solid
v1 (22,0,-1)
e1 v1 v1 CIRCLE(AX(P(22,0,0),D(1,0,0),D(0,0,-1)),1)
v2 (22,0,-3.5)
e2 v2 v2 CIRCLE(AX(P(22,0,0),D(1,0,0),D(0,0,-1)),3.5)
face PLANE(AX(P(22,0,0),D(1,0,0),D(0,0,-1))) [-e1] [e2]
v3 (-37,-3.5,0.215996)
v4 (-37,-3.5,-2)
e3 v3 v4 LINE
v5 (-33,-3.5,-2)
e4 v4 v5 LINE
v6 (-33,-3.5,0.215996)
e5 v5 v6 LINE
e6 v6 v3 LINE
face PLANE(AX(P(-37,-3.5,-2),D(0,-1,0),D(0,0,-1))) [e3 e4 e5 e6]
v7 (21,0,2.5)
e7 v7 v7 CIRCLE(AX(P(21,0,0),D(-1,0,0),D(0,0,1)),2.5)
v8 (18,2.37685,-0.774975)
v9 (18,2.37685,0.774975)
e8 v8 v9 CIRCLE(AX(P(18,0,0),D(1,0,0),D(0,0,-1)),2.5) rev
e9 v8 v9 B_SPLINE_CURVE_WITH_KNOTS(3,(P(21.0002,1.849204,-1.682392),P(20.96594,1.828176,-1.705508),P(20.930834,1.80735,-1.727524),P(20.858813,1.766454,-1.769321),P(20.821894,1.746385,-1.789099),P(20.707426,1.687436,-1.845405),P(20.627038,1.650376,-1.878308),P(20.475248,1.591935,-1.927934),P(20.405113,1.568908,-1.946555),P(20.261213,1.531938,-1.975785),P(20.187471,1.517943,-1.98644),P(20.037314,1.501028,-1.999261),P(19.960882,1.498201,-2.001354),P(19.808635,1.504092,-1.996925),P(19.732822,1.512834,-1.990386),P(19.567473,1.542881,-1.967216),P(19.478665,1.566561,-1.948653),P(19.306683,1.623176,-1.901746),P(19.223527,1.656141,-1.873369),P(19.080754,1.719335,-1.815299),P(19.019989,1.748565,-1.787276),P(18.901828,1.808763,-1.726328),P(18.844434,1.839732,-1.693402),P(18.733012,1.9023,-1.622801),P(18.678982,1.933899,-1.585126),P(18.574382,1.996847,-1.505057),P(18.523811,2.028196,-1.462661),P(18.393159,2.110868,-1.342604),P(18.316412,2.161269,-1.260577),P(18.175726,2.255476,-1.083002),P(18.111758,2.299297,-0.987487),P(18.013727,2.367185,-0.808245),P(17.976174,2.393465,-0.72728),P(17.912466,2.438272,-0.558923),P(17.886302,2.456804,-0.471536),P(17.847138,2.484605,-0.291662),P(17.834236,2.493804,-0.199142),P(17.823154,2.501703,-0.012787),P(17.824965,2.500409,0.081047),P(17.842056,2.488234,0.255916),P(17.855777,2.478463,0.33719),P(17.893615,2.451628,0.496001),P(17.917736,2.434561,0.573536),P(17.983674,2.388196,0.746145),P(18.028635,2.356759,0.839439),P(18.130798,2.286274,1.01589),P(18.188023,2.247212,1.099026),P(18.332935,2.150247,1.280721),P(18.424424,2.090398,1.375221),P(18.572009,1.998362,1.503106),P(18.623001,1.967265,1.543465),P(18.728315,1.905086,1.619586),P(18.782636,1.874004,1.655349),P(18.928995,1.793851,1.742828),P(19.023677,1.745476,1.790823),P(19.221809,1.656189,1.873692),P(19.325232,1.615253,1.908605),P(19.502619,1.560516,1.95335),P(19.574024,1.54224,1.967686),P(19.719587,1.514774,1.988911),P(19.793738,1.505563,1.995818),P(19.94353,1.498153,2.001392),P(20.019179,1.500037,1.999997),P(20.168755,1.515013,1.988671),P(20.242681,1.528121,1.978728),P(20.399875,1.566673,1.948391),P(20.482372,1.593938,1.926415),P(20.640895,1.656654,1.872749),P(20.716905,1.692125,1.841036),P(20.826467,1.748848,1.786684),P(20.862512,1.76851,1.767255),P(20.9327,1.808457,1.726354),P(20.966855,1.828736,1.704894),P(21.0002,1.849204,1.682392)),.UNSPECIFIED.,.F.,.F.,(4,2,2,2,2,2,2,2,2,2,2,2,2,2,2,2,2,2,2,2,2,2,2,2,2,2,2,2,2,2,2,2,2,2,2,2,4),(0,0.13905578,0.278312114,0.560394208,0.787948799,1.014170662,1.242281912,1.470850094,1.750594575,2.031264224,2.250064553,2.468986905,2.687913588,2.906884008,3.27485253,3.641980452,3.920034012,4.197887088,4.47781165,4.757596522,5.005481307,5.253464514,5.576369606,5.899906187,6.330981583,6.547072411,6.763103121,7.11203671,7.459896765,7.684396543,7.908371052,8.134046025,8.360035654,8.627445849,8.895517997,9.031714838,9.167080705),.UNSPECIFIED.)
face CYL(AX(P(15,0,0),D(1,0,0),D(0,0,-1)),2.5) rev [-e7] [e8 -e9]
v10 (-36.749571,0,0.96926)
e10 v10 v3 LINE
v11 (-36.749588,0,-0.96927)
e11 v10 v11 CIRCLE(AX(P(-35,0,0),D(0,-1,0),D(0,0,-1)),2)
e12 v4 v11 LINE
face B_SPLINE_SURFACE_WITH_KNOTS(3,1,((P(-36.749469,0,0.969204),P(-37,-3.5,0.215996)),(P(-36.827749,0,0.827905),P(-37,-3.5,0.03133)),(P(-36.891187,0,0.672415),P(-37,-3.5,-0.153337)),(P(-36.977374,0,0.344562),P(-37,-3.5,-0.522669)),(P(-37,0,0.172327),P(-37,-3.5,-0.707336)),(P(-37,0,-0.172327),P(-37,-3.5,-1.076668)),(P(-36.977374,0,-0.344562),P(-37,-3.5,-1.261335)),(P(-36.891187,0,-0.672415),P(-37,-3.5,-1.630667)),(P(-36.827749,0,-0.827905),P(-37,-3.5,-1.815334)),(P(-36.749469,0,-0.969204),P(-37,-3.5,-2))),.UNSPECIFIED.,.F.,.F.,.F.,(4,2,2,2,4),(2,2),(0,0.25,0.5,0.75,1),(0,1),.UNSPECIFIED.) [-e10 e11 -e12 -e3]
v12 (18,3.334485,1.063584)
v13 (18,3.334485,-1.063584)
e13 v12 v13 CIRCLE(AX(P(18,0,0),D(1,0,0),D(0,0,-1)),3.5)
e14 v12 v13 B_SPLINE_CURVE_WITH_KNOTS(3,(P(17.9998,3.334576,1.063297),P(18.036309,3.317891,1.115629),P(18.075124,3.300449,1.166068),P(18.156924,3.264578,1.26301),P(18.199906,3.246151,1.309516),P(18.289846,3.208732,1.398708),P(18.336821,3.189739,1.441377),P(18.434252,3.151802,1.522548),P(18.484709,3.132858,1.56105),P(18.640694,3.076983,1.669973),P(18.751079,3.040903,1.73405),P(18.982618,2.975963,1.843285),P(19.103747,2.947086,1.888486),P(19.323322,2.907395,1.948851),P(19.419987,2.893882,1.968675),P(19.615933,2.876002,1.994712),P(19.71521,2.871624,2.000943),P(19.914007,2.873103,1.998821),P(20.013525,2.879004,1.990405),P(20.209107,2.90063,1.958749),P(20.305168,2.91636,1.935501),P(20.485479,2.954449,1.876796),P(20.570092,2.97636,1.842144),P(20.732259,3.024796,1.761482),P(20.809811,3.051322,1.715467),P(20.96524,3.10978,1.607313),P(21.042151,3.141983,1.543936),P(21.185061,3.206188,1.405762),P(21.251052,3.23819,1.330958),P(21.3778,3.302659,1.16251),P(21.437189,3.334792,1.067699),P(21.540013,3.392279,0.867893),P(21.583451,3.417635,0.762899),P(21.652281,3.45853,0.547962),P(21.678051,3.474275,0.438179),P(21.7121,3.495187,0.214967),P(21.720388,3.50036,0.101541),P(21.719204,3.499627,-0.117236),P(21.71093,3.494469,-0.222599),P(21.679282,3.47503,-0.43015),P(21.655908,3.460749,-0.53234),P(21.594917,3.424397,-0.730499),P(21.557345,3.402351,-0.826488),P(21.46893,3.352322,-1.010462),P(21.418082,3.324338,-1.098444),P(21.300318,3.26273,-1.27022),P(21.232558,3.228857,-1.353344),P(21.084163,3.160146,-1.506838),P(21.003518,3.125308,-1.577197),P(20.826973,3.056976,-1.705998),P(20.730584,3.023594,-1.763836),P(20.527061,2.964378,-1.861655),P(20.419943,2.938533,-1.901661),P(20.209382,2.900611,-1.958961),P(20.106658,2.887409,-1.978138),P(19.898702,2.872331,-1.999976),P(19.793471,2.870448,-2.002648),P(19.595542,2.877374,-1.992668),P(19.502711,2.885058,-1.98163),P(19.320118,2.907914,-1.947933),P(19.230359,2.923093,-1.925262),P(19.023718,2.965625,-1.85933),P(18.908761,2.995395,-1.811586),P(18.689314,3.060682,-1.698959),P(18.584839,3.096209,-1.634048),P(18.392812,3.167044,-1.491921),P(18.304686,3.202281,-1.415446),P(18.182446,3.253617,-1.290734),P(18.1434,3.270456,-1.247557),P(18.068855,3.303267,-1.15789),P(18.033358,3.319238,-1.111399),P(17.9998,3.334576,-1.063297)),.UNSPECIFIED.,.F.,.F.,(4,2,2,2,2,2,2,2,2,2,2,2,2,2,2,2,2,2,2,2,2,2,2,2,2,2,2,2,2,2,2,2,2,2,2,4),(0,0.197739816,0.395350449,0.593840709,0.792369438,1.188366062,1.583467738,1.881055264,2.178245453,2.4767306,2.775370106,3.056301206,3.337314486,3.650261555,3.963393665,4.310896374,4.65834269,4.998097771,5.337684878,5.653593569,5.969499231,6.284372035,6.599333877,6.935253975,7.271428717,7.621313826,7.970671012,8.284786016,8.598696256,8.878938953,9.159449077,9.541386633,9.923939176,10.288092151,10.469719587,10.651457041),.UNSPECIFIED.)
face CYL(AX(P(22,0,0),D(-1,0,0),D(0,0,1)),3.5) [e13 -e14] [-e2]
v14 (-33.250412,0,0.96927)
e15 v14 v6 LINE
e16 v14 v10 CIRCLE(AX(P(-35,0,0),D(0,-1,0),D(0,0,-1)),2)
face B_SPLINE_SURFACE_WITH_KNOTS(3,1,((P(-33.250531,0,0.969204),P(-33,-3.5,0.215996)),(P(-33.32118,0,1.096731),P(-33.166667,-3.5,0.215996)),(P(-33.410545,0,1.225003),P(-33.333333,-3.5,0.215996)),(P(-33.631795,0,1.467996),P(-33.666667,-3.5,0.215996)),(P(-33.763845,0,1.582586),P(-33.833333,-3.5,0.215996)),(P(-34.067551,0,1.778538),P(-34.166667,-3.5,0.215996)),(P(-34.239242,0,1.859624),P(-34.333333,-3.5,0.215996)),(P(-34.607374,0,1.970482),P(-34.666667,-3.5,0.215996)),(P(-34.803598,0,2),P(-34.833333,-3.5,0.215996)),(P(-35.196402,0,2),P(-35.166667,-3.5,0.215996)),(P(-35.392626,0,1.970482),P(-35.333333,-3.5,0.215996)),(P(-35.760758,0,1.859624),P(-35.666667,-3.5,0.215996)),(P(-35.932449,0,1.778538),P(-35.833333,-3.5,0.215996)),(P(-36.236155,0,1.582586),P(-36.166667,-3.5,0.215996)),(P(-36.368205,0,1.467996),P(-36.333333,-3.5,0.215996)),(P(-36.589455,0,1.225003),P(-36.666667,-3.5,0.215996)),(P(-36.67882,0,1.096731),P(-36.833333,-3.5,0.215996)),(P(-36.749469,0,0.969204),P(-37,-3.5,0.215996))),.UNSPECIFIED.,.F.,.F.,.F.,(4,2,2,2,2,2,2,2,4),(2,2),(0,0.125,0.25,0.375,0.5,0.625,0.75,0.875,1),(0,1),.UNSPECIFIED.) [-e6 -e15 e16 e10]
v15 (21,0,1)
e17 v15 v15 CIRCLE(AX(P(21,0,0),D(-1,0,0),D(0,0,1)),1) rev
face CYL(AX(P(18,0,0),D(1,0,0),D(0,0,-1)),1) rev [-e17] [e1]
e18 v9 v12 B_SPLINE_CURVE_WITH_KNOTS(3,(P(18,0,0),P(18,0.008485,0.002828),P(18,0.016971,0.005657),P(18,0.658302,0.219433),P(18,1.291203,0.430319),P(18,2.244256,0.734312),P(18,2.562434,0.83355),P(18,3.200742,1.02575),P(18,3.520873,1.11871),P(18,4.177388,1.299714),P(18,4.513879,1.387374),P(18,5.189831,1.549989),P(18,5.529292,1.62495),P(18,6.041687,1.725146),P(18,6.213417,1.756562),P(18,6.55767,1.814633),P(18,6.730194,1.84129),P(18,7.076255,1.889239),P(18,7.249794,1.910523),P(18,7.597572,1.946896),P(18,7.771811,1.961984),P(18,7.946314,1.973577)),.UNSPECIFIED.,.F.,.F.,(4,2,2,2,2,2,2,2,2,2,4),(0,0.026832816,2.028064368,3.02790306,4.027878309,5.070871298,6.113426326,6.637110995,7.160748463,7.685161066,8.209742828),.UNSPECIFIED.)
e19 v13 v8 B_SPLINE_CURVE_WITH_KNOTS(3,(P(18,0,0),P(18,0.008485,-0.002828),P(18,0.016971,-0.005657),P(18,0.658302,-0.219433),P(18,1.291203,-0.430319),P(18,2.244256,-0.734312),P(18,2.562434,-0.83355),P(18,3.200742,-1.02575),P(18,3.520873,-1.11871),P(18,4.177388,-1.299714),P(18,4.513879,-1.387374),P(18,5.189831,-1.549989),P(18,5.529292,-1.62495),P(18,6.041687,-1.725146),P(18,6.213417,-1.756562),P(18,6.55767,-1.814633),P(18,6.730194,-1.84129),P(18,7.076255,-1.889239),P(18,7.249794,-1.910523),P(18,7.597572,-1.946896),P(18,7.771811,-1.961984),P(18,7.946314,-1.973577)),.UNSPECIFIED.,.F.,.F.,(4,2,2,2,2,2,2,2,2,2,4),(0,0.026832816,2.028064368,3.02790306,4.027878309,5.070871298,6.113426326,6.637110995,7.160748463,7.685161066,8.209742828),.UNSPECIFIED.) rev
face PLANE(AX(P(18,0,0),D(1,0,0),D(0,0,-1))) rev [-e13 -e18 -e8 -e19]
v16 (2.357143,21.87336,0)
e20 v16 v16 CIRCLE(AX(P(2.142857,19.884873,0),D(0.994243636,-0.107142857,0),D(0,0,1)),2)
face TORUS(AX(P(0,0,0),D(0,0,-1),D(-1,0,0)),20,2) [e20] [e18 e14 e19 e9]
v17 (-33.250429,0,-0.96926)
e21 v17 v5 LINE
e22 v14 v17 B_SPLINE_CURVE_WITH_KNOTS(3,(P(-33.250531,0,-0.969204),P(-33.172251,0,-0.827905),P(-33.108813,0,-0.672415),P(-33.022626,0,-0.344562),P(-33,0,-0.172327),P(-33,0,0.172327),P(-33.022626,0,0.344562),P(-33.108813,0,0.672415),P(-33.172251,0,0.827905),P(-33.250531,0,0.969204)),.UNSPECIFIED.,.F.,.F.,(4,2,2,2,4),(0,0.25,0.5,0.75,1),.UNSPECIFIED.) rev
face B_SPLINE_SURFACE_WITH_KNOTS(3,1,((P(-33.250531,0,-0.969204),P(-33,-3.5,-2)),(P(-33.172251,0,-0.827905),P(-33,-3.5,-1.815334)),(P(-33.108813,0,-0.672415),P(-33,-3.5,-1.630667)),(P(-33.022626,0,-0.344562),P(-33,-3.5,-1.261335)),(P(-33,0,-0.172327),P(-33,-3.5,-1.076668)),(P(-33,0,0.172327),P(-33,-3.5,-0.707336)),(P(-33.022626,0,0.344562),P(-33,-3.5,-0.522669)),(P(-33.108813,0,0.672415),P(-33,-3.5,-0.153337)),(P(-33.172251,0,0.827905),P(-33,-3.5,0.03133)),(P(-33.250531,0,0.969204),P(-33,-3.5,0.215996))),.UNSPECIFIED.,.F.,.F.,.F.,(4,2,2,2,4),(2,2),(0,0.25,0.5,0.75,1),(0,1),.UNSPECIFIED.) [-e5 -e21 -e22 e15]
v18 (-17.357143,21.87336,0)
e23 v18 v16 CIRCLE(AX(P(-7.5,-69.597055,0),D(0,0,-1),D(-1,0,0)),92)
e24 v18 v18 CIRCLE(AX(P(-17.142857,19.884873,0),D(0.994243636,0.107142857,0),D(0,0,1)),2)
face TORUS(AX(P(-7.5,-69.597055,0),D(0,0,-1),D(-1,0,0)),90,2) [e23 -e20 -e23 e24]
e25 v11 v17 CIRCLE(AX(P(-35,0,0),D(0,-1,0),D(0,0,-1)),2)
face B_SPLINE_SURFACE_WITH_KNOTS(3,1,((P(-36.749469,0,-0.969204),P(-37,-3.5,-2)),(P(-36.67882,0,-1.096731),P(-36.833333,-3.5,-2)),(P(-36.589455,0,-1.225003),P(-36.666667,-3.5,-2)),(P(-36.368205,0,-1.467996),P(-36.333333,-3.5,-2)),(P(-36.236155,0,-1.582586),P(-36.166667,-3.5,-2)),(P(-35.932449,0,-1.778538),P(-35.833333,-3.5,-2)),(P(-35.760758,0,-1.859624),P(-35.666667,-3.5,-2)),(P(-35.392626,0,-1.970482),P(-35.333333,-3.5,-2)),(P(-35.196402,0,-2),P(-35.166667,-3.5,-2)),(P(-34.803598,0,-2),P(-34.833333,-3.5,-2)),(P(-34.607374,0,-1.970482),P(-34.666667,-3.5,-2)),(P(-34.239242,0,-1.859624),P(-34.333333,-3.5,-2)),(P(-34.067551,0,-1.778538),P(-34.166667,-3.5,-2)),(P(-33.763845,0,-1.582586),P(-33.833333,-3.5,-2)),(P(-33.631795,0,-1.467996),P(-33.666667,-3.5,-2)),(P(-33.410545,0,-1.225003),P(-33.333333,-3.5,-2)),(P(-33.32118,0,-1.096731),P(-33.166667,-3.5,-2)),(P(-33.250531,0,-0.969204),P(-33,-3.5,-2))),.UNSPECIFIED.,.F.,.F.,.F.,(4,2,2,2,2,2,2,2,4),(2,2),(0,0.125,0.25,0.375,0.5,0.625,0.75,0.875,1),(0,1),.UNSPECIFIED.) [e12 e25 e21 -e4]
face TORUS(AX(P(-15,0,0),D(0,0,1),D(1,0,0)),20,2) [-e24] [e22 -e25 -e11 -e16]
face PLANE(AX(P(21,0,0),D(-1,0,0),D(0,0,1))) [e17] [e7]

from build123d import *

# Parameters (mm, degrees)
ESQUISSE2_R                  = 2
BOSS_EXTRU_1_START           = 18
ESQUISSE3_R                  = 3.5
BOSS_EXTRU_1_DEPTH           = 4
ESQUISSE4_R                  = 1
ENL_V_MAT_EXTRU_1_DEPTH      = 4
ENL_V_MAT_EXTRU_2_DEPTH      = 3
ENL_V_MAT_EXTRU_2_DEPTH_BACK = 3
ESQUISSE5_R                  = 2.5


with BuildPart() as part:
    # Balayage1: sweep along a path in Esquisse1
    with BuildLine(Plane.XY) as balayage1_path:
        ThreePointArc((20, 0), (14.880476183, 13.363062096), (2.142857143, 19.884872724))
        ThreePointArc((2.142857143, 19.884872724), (-7.5, 20.402945465), (-17.142857143, 19.884872724))
        ThreePointArc((-17.142857143, 19.884872724), (-29.880476183, 13.363062096), (-35, 0))
    # Esquisse2 → Balayage1 (sweep)
    with BuildSketch(Plane(origin=(0, 0, 0), x_dir=(1, 0, 0), z_dir=(0, 1, 0))):
        with Locations((-35, 0)):
            Circle(ESQUISSE2_R)
    sweep(path=balayage1_path.line)

    # Esquisse3 → Boss.-Extru.1 (add)
    with BuildSketch(Plane(origin=(0, 0, 0), x_dir=(0, 0, -1), z_dir=(1, 0, 0)).offset(BOSS_EXTRU_1_START)):
        with Locations(Location((0, 0, 0), (0, 0, 107.690863125))):
            Circle(ESQUISSE3_R)
    extrude(amount=BOSS_EXTRU_1_DEPTH)

    # Esquisse4 → Enlèv. mat.-Extru.1 (cut)
    with BuildSketch(Plane(origin=(22, 0, 0), x_dir=(0, 0, -1), z_dir=(1, 0, 0))):
        Circle(ESQUISSE4_R)
    extrude(amount=-ENL_V_MAT_EXTRU_1_DEPTH, mode=Mode.SUBTRACT)

    # Esquisse5 → Enlèv. mat.-Extru.2 (cut, two sides: drawn at the far end of the back side and taken through both)
    with BuildSketch(Plane.ZY.offset(-18).offset(-ENL_V_MAT_EXTRU_2_DEPTH_BACK)):
        with Locations(Location((0, 0, 0), (0, 0, 108.058622976))):
            Circle(ESQUISSE5_R)
    extrude(amount=ENL_V_MAT_EXTRU_2_DEPTH + ENL_V_MAT_EXTRU_2_DEPTH_BACK, mode=Mode.SUBTRACT)

    # Lissage1: read off the stored shape, not the designer's step
    # Lissage1: loft between two sections, ruled curve by curve
    lissage1_from = [
        Edge.make_bspline([(-36.749469355, 0, -0.969204301), (-36.678819637, 0, -1.096731094), (-36.589454865, 0, -1.225003052), (-36.368205496, 0, -1.467996241), (-36.236155441, 0, -1.582585979), (-35.932449234, 0, -1.778537905), (-35.760757814, 0, -1.859623663), (-35.392626028, 0, -1.97048152), (-35.196401592, 0, -2), (-34.803598408, 0, -2), (-34.607373972, 0, -1.97048152), (-34.239242186, 0, -1.859623663), (-34.067550766, 0, -1.778537905), (-33.763844559, 0, -1.582585979), (-33.631794504, 0, -1.467996241), (-33.410545135, 0, -1.225003052), (-33.321180363, 0, -1.096731094), (-33.250530645, 0, -0.969204301)], [0, 0, 0, 0, 0.125, 0.125, 0.25, 0.25, 0.375, 0.375, 0.5, 0.5, 0.625, 0.625, 0.75, 0.75, 0.875, 0.875, 1, 1, 1, 1], 3),
        Edge.make_bspline([(-33.250530645, 0, -0.969204301), (-33.172250897, 0, -0.827904866), (-33.108813179, 0, -0.672414541), (-33.022626455, 0, -0.344561707), (-33, 0, -0.172327372), (-33, 0, 0.172327372), (-33.022626455, 0, 0.344561707), (-33.108813179, 0, 0.672414541), (-33.172250897, 0, 0.827904866), (-33.250530645, 0, 0.969204301)], [0, 0, 0, 0, 0.25, 0.25, 0.5, 0.5, 0.75, 0.75, 1, 1, 1, 1], 3),
        Edge.make_bspline([(-36.749469355, 0, 0.969204301), (-36.827749103, 0, 0.827904866), (-36.891186821, 0, 0.672414541), (-36.977373545, 0, 0.344561707), (-37, 0, 0.172327372), (-37, 0, -0.172327372), (-36.977373545, 0, -0.344561707), (-36.891186821, 0, -0.672414541), (-36.827749103, 0, -0.827904866), (-36.749469355, 0, -0.969204301)], [0, 0, 0, 0, 0.25, 0.25, 0.5, 0.5, 0.75, 0.75, 1, 1, 1, 1], 3),
        Edge.make_bspline([(-33.250530645, 0, 0.969204301), (-33.321180363, 0, 1.096731094), (-33.410545135, 0, 1.225003052), (-33.631794504, 0, 1.467996241), (-33.763844559, 0, 1.582585979), (-34.067550766, 0, 1.778537905), (-34.239242186, 0, 1.859623663), (-34.607373972, 0, 1.97048152), (-34.803598408, 0, 2), (-35.196401592, 0, 2), (-35.392626028, 0, 1.97048152), (-35.760757814, 0, 1.859623663), (-35.932449234, 0, 1.778537905), (-36.236155441, 0, 1.582585979), (-36.368205496, 0, 1.467996241), (-36.589454865, 0, 1.225003052), (-36.678819637, 0, 1.096731094), (-36.749469355, 0, 0.969204301)], [0, 0, 0, 0, 0.125, 0.125, 0.25, 0.25, 0.375, 0.375, 0.5, 0.5, 0.625, 0.625, 0.75, 0.75, 0.875, 0.875, 1, 1, 1, 1], 3),
    ]
    lissage1_to = [
        Edge.make_bspline([(-37, -3.5, -2), (-36.833333333, -3.5, -2), (-36.666666667, -3.5, -2), (-36.333333333, -3.5, -2), (-36.166666667, -3.5, -2), (-35.833333333, -3.5, -2), (-35.666666667, -3.5, -2), (-35.333333333, -3.5, -2), (-35.166666667, -3.5, -2), (-34.833333333, -3.5, -2), (-34.666666667, -3.5, -2), (-34.333333333, -3.5, -2), (-34.166666667, -3.5, -2), (-33.833333333, -3.5, -2), (-33.666666667, -3.5, -2), (-33.333333333, -3.5, -2), (-33.166666667, -3.5, -2), (-33, -3.5, -2)], [0, 0, 0, 0, 0.125, 0.125, 0.25, 0.25, 0.375, 0.375, 0.5, 0.5, 0.625, 0.625, 0.75, 0.75, 0.875, 0.875, 1, 1, 1, 1], 3),
        Edge.make_bspline([(-33, -3.5, -2), (-33, -3.5, -1.815333661), (-33, -3.5, -1.630667323), (-33, -3.5, -1.261334645), (-33, -3.5, -1.076668307), (-33, -3.5, -0.707335629), (-33, -3.5, -0.52266929), (-33, -3.5, -0.153336613), (-33, -3.5, 0.031329726), (-33, -3.5, 0.215996064)], [0, 0, 0, 0, 0.25, 0.25, 0.5, 0.5, 0.75, 0.75, 1, 1, 1, 1], 3),
        Edge.make_bspline([(-37, -3.5, 0.215996064), (-37, -3.5, 0.031329726), (-37, -3.5, -0.153336613), (-37, -3.5, -0.52266929), (-37, -3.5, -0.707335629), (-37, -3.5, -1.076668307), (-37, -3.5, -1.261334645), (-37, -3.5, -1.630667323), (-37, -3.5, -1.815333661), (-37, -3.5, -2)], [0, 0, 0, 0, 0.25, 0.25, 0.5, 0.5, 0.75, 0.75, 1, 1, 1, 1], 3),
        Edge.make_bspline([(-33, -3.5, 0.215996064), (-33.166666667, -3.5, 0.215996064), (-33.333333333, -3.5, 0.215996064), (-33.666666667, -3.5, 0.215996064), (-33.833333333, -3.5, 0.215996064), (-34.166666667, -3.5, 0.215996064), (-34.333333333, -3.5, 0.215996064), (-34.666666667, -3.5, 0.215996064), (-34.833333333, -3.5, 0.215996064), (-35.166666667, -3.5, 0.215996064), (-35.333333333, -3.5, 0.215996064), (-35.666666667, -3.5, 0.215996064), (-35.833333333, -3.5, 0.215996064), (-36.166666667, -3.5, 0.215996064), (-36.333333333, -3.5, 0.215996064), (-36.666666667, -3.5, 0.215996064), (-36.833333333, -3.5, 0.215996064), (-37, -3.5, 0.215996064)], [0, 0, 0, 0, 0.125, 0.125, 0.25, 0.25, 0.375, 0.375, 0.5, 0.5, 0.625, 0.625, 0.75, 0.75, 0.875, 0.875, 1, 1, 1, 1], 3),
    ]
    lissage1 = Solid(Shell([*[Face.make_surface_from_curves(lissage1_from[k], lissage1_to[k]) for k in range(4)], Face(Wire(lissage1_from)), Face(Wire(lissage1_to))]))
    add(lissage1)


solid = part.part
